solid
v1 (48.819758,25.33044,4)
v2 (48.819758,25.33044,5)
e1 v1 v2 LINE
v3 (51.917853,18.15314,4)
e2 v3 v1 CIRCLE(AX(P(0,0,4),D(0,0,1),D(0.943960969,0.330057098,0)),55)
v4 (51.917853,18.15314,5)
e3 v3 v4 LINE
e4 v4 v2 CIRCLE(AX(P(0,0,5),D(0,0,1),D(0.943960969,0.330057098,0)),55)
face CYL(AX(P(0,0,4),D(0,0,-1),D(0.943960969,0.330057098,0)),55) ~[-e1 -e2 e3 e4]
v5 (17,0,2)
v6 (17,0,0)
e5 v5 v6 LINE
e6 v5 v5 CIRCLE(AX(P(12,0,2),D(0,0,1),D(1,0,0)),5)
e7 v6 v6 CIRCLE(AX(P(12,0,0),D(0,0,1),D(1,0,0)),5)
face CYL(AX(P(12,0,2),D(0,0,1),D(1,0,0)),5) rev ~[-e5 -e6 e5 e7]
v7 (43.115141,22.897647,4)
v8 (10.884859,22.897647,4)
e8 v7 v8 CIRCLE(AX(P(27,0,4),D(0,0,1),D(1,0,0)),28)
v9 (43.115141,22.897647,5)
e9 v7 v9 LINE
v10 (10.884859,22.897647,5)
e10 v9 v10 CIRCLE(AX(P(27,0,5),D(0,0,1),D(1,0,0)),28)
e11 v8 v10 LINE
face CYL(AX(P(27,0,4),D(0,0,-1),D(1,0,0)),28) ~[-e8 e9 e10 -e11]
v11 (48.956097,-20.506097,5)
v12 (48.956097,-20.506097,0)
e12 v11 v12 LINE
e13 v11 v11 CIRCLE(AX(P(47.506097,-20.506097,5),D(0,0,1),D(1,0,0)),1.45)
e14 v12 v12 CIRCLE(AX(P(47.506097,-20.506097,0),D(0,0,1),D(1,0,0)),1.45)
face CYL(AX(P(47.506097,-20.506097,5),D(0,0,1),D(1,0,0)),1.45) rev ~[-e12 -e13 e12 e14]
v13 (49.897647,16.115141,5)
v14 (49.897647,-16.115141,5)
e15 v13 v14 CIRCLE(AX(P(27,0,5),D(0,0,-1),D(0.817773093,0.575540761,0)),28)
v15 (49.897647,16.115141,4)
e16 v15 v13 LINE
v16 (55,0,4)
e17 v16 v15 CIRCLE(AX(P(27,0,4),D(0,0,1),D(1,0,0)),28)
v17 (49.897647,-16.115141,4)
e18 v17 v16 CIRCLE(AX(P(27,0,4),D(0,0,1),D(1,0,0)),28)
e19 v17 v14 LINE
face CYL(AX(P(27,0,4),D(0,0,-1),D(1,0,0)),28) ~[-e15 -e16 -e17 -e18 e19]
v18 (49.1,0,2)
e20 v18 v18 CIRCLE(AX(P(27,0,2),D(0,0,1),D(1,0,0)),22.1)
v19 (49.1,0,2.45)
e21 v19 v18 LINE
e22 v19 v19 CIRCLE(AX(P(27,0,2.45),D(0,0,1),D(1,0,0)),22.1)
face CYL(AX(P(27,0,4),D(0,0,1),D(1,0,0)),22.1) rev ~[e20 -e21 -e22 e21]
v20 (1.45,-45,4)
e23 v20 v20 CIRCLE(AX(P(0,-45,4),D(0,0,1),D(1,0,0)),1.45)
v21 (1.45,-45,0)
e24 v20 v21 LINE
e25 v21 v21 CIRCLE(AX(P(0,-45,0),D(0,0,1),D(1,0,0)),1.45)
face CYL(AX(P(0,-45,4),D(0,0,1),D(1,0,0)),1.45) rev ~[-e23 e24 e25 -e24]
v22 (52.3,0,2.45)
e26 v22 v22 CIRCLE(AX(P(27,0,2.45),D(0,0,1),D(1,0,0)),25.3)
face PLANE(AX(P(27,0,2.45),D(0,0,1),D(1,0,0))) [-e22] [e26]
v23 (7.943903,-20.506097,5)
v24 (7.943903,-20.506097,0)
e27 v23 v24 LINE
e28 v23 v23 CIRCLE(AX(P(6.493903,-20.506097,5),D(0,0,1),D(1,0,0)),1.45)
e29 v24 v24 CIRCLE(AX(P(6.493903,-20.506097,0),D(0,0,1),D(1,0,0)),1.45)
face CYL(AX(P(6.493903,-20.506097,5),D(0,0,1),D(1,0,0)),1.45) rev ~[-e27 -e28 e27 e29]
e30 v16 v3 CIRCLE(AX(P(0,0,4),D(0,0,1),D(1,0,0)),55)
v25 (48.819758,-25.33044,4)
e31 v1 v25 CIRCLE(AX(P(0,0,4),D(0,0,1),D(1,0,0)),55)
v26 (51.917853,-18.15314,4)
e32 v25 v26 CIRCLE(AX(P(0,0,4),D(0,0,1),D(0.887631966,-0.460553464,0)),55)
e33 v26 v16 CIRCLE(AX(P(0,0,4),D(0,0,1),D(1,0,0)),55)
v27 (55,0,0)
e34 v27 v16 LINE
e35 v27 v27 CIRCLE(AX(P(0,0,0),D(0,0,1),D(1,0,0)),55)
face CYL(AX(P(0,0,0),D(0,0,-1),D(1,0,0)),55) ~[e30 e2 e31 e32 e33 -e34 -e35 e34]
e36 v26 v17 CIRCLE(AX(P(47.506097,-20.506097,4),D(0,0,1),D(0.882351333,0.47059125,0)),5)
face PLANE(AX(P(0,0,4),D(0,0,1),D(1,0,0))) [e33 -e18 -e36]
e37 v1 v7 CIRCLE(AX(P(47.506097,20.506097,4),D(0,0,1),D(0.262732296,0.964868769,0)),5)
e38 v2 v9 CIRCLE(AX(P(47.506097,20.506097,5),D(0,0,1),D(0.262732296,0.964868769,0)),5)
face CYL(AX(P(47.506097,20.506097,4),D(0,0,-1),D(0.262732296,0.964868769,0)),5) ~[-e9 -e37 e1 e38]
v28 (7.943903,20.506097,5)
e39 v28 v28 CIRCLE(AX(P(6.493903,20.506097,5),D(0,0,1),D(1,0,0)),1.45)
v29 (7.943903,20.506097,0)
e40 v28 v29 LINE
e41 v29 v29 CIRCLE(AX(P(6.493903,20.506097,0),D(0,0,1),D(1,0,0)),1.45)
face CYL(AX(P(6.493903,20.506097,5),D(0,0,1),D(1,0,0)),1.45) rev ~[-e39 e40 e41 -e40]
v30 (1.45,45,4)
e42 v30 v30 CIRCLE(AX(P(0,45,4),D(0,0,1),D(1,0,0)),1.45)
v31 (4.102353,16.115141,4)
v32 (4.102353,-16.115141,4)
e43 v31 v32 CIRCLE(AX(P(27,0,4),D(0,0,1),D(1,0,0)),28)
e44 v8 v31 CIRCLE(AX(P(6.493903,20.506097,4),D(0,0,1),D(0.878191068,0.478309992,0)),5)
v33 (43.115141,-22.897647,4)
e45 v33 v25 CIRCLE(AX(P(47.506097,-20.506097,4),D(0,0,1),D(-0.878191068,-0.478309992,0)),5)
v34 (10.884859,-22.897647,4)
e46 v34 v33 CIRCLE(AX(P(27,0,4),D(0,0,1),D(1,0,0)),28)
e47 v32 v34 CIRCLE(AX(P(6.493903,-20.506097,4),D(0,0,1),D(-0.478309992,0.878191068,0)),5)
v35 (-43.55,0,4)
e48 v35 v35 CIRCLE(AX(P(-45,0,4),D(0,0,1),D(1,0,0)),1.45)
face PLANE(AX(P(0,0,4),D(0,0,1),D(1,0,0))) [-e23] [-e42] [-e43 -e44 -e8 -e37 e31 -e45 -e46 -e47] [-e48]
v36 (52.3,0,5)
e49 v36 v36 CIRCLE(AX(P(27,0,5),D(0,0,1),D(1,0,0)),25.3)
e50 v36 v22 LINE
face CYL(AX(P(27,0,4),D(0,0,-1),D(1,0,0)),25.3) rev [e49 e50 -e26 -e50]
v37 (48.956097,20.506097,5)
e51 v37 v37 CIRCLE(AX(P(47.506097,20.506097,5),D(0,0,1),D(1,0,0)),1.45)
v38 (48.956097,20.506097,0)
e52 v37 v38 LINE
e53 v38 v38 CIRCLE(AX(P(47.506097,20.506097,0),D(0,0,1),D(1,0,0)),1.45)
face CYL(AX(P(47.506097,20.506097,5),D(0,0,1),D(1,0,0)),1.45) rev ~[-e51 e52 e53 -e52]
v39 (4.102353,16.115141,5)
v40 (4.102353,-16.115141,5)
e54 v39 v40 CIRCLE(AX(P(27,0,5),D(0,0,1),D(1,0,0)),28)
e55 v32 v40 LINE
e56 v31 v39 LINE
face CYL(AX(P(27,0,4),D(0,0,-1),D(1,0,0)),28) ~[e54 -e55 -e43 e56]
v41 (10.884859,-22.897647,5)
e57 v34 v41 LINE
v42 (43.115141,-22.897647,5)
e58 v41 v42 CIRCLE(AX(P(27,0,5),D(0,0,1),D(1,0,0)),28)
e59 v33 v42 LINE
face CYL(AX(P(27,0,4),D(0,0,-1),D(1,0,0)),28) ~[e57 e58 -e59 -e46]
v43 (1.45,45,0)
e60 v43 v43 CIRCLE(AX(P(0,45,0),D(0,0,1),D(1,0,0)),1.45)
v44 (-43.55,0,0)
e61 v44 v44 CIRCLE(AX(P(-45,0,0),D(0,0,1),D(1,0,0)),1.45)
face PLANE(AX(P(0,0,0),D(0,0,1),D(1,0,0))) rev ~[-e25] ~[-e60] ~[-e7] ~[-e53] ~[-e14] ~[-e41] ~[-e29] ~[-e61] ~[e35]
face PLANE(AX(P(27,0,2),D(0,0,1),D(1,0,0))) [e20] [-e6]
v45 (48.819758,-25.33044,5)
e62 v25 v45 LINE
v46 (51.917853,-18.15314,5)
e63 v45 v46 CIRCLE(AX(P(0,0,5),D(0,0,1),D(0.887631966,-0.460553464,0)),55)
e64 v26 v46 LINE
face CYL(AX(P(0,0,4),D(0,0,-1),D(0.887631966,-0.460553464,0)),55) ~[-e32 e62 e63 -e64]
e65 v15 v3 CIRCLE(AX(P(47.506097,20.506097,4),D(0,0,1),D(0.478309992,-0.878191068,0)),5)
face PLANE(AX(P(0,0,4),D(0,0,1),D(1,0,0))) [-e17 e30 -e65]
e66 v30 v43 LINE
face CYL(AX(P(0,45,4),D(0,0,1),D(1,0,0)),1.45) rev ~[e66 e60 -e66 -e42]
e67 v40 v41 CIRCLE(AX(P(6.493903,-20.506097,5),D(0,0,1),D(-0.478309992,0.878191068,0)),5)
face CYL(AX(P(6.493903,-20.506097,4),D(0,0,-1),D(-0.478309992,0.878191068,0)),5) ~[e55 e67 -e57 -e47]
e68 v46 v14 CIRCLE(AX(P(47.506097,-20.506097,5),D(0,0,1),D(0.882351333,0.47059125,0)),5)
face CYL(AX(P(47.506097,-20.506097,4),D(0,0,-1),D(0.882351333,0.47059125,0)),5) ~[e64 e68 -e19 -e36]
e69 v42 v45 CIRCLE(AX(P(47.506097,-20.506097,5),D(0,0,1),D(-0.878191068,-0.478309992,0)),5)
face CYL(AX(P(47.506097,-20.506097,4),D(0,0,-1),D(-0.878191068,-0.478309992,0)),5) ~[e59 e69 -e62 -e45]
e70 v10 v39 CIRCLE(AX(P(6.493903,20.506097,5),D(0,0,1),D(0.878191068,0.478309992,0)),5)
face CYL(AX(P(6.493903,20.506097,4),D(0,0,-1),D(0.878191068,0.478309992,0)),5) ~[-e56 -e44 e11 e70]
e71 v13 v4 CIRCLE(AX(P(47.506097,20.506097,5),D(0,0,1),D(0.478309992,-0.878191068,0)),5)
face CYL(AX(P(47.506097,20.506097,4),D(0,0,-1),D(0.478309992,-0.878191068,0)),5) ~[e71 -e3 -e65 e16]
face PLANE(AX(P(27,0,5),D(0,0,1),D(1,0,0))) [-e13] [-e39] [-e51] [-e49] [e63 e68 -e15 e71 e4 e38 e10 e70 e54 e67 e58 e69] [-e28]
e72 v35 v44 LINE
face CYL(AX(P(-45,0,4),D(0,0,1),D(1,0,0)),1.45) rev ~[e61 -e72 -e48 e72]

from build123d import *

# Parameters (mm, degrees)
F0_R      = 55
F1_DEPTH  = 4
F2_R      = 22.1
F3_DEPTH  = 2
F4_R      = 25.3
F4_R_2    = 22.1
F5_DEPTH  = 1.55
F6_R      = 28
F6_R_2    = 25.3
F7_DEPTH  = 1
F8_R      = 5
F9_DEPTH  = 25
F11_DEPTH = 1
F12_R     = 1.45
F13_DEPTH = 25
F14_R     = 1.45
F15_DEPTH = 25


with BuildPart() as f1:
    # F0 (on Top) → F1 (new body)
    with BuildSketch(Plane.XY):
        Circle(F0_R)
    extrude(amount=F1_DEPTH)

    # F2 (on face) → F3 (cut)
    with BuildSketch(Plane.XY.offset(4)):
        with Locations((27, 0)):
            Circle(F2_R)
    extrude(amount=-F3_DEPTH, mode=Mode.SUBTRACT)

    # F4 (on face) → F5 (cut)
    with BuildSketch(Plane.XY.offset(4)):
        with Locations((27, 0)):
            Circle(F4_R)
        with Locations((27, 0)):
            Circle(F4_R_2, mode=Mode.SUBTRACT)
    extrude(amount=-F5_DEPTH, mode=Mode.SUBTRACT)

    # F6 (on face) → F7 (join)
    with BuildSketch(Plane.XY.offset(4)):
        with Locations((27, 0)):
            Circle(F6_R)
        with Locations((27, 0)):
            Circle(F6_R_2, mode=Mode.SUBTRACT)
    extrude(amount=F7_DEPTH)

    # F8 (on face) → F9 (cut)
    with BuildSketch(Plane.XY.offset(2)):
        with Locations((12, 0)):
            Circle(F8_R)
    extrude(amount=-F9_DEPTH, mode=Mode.SUBTRACT)

    # F10 (on face) → F11 (join)
    with BuildSketch(Plane.XY.offset(4)):
        with BuildLine():
            ThreePointArc((10.8848586854, -22.8976466129), (7.2010101268, -19.7989898732), (4.1023533871, -16.1151413146))
            ThreePointArc((4.1023533871, -16.1151413146), (2.9583694397, -24.0416305603), (10.8848586854, -22.8976466129))
        make_face()
        with BuildLine():
            ThreePointArc((10.8848586854, 22.8976466129), (2.9583694397, 24.0416305603), (4.1023533871, 16.1151413146))
            ThreePointArc((4.1023533871, 16.1151413146), (7.2010101268, 19.7989898732), (10.8848586854, 22.8976466129))
        make_face()
        with BuildLine():
            ThreePointArc((49.8976466129, -16.1151413146), (46.7989898732, -19.7989898732), (43.1151413146, -22.8976466129))
            ThreePointArc((43.1151413146, -22.8976466129), (45.5447053375, -25.105329645), (48.8197581332, -25.3304404978))
            ThreePointArc((48.8197581332, -25.3304404978), (50.4964850216, -21.7969034605), (51.917853321, -18.1531404043))
            ThreePointArc((51.917853321, -18.1531404043), (51.0570972643, -16.9860974117), (49.8976466129, -16.1151413146))
        make_face()
        with BuildLine():
            ThreePointArc((48.8197581332, 25.3304404978), (45.5447053375, 25.105329645), (43.1151413146, 22.8976466129))
            ThreePointArc((43.1151413146, 22.8976466129), (46.7989898732, 19.7989898732), (49.8976466129, 16.1151413146))
            ThreePointArc((49.8976466129, 16.1151413146), (51.0570972643, 16.9860974117), (51.917853321, 18.1531404043))
            ThreePointArc((51.917853321, 18.1531404043), (50.4964850216, 21.7969034605), (48.8197581332, 25.3304404978))
        make_face()
    extrude(amount=F11_DEPTH)

    # F12 (on face) → F13 (cut)
    with BuildSketch(Plane.XY.offset(5)):
        with Locations((6.4939033456, 20.5060966544)):
            Circle(F12_R)
        with Locations((47.5060966544, 20.5060966544)):
            Circle(F12_R)
        with Locations((47.5060966544, -20.5060966544)):
            Circle(F12_R)
        with Locations((6.4939033456, -20.5060966544)):
            Circle(F12_R)
    extrude(amount=-F13_DEPTH, mode=Mode.SUBTRACT)

    # F14 (on face) → F15 (cut)
    with BuildSketch(Plane.XY.offset(4)):
        with Locations((0, 45)):
            Circle(F14_R)
        with Locations((-45, 0)):
            Circle(F14_R)
        with Locations((0, -45)):
            Circle(F14_R)
    extrude(amount=-F15_DEPTH, mode=Mode.SUBTRACT)


solid = f1.part
